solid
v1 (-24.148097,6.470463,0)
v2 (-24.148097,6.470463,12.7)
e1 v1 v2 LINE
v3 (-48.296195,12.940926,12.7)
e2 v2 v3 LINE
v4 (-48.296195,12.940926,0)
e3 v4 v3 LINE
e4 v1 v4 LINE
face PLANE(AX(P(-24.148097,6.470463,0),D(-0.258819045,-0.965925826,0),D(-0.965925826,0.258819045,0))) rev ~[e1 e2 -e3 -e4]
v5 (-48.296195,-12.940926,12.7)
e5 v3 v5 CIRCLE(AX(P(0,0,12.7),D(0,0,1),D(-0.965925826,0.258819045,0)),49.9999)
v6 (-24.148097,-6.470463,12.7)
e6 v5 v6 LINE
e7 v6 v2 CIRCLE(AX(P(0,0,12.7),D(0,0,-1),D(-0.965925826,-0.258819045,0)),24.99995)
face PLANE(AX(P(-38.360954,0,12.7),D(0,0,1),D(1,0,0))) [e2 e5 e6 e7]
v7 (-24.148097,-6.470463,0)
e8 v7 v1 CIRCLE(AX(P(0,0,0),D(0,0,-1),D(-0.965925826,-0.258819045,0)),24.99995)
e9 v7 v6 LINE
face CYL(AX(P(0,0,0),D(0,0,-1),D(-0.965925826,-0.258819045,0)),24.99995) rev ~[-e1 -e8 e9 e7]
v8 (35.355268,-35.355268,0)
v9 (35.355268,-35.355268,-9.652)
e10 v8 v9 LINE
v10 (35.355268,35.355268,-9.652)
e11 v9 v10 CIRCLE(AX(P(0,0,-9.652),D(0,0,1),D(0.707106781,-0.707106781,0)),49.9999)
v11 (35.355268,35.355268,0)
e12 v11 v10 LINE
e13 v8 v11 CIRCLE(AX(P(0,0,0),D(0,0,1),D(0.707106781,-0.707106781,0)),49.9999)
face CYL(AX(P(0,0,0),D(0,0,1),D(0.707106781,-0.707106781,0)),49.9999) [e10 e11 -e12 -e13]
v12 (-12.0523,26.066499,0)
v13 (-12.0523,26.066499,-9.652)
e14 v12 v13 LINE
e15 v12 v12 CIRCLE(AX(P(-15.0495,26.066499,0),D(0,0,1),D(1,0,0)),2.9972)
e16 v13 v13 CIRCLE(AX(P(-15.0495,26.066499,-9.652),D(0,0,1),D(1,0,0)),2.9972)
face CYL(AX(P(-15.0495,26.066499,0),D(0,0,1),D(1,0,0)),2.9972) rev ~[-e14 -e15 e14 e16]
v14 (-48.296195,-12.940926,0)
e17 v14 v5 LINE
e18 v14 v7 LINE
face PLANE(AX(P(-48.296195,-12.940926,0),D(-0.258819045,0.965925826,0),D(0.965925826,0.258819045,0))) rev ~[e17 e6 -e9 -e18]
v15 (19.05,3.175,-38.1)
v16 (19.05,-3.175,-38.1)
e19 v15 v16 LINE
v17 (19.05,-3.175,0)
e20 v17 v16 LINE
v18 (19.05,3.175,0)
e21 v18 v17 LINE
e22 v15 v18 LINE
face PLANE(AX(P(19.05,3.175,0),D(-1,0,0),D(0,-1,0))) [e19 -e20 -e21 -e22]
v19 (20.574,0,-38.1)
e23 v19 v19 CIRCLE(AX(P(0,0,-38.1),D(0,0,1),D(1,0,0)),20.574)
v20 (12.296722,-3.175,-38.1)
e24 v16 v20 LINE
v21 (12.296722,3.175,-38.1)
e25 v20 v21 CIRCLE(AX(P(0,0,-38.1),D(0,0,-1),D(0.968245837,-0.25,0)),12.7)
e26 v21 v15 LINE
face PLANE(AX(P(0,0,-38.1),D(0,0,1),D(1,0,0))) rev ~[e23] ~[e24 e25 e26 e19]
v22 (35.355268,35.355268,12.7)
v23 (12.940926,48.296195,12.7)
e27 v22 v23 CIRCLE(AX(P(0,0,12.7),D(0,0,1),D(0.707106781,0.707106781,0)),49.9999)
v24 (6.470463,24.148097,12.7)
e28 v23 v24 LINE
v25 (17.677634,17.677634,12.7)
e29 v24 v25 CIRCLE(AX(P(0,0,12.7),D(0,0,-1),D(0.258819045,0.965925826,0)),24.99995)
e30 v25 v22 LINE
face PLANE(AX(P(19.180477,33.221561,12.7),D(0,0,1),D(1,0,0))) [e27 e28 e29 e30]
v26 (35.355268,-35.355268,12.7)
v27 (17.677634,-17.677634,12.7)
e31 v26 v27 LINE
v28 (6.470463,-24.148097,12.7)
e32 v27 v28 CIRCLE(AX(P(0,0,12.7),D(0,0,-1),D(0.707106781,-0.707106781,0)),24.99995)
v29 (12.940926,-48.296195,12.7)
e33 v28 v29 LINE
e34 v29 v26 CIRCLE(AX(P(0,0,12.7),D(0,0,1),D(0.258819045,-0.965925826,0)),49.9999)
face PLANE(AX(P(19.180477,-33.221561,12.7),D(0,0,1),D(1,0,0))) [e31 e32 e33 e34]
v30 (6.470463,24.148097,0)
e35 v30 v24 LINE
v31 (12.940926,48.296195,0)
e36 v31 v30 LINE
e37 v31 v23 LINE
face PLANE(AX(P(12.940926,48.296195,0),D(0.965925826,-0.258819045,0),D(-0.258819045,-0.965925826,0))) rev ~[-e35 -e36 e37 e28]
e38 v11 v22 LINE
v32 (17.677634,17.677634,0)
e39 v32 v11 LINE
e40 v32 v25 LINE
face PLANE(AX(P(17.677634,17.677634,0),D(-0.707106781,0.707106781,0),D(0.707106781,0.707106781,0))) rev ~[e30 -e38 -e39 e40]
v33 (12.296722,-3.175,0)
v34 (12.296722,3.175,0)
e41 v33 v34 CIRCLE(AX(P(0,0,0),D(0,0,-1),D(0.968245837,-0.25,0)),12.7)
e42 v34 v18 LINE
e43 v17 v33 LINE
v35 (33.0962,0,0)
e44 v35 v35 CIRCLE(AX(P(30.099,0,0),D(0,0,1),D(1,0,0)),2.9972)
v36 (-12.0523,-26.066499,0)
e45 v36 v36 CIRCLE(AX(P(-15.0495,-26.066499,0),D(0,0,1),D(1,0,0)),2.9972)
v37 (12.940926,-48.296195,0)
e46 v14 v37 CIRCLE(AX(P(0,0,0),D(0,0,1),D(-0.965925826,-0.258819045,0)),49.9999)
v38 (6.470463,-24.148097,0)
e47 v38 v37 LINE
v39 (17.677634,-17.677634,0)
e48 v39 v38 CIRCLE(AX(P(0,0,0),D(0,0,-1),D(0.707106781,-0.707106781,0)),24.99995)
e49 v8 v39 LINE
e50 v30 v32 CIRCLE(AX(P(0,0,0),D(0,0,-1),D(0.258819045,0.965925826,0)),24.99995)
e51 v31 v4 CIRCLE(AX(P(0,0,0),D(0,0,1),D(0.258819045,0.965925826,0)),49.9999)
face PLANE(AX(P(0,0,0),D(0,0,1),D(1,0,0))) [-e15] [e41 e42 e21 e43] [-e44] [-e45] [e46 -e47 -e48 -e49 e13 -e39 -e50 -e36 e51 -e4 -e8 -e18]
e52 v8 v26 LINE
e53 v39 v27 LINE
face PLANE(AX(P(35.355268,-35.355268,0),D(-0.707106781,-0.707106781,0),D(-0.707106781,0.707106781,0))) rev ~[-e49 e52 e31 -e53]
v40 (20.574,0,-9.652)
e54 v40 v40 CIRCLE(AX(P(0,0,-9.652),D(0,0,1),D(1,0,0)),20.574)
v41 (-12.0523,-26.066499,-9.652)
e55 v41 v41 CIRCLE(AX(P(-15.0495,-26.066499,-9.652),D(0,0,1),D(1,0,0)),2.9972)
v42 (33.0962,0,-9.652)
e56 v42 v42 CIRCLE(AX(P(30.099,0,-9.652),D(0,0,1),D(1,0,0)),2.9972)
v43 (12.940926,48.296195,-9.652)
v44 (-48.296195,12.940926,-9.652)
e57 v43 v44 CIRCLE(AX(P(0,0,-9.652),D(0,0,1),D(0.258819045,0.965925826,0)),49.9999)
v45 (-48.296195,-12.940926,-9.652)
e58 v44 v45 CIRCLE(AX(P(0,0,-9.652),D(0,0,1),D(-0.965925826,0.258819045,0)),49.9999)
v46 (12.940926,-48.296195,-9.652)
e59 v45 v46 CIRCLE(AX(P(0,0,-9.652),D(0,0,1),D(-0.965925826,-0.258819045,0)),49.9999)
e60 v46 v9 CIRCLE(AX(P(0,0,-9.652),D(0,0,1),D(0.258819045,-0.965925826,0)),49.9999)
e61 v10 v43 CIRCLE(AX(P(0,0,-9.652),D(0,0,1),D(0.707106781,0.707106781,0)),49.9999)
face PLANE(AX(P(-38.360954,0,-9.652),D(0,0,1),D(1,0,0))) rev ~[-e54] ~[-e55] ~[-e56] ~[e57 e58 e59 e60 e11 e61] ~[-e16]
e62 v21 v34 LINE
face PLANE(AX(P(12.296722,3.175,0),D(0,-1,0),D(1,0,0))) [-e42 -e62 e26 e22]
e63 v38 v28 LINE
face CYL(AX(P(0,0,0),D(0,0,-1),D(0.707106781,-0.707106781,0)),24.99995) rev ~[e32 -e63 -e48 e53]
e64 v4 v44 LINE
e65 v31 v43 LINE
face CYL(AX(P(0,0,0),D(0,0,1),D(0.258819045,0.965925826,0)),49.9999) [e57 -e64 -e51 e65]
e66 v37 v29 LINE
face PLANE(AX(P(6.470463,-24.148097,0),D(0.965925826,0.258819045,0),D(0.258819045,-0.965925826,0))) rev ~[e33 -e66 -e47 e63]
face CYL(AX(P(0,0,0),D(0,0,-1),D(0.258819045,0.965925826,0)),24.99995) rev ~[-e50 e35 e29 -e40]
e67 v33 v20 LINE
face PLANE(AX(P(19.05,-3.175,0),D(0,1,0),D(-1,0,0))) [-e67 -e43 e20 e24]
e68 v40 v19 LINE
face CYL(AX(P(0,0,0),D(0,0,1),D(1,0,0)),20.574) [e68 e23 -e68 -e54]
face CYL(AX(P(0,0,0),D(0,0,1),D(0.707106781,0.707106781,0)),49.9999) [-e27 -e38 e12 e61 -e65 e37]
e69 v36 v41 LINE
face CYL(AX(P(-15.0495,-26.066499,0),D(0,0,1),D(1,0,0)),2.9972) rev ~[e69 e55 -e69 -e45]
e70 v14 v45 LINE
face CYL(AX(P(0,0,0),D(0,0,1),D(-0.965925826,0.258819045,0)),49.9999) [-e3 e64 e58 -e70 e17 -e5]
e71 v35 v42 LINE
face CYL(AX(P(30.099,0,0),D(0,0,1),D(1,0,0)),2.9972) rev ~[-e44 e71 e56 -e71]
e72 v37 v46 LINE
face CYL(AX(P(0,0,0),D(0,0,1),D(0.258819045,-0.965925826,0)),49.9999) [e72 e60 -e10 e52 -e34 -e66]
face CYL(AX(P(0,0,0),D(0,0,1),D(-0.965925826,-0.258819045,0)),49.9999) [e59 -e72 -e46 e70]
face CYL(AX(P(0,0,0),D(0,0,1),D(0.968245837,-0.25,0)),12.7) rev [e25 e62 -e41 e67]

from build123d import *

# Parameters (mm, degrees)
F1_DEPTH = 12.7
F0_R     = 2.9972
F0_R_2   = 20.574
F2_DEPTH = 9.652
F3_DEPTH = 9.652
F4_DEPTH = 38.1


with BuildPart() as f1:
    # F0 (on Top) → F1 (new body)
    with BuildSketch(Plane.XY):
        with BuildLine():
            Line((-24.1480973609, 6.4704631866), (-48.2961947219, 12.9409263732))
            ThreePointArc((-48.2961947219, 12.9409263732), (-49.9999, 0), (-48.2961947219, -12.9409263732))
            Line((-48.2961947219, -12.9409263732), (-24.1480973609, -6.4704631866))
            ThreePointArc((-24.1480973609, -6.4704631866), (-24.99995, 0), (-24.1480973609, 6.4704631866))
        make_face()
    extrude(amount=F1_DEPTH)



with BuildPart() as f1b:
    # F0 (on Top) → F1, piece 2 (new body)
    with BuildSketch(Plane.XY):
        with BuildLine():
            Line((17.6776341743, 17.6776341743), (35.3552683486, 35.3552683486))
            ThreePointArc((35.3552683486, 35.3552683486), (24.99995, 43.3011835867), (12.9409263732, 48.2961947219))
            Line((12.9409263732, 48.2961947219), (6.4704631866, 24.1480973609))
            ThreePointArc((6.4704631866, 24.1480973609), (12.499975, 21.6505917933), (17.6776341743, 17.6776341743))
        make_face()
    extrude(amount=F1_DEPTH)


with BuildPart() as f1c:
    # F0 (on Top) → F1, piece 3 (new body)
    with BuildSketch(Plane.XY):
        with BuildLine():
            ThreePointArc((12.9409263732, -48.2961947219), (24.99995, -43.3011835867), (35.3552683486, -35.3552683486))
            Line((35.3552683486, -35.3552683486), (17.6776341743, -17.6776341743))
            ThreePointArc((17.6776341743, -17.6776341743), (12.499975, -21.6505917933), (6.4704631866, -24.1480973609))
            Line((6.4704631866, -24.1480973609), (12.9409263732, -48.2961947219))
        make_face()
    extrude(amount=F1_DEPTH)


with BuildPart() as f1_1:
    add(f1.part)

    add(f1b.part)  # F2 merges F1b

    add(f1c.part)  # F2 merges F1c
    # F0 (on Top) → F2 (join)
    with BuildSketch(Plane.XY):
        with BuildLine():
            ThreePointArc((35.3552683486, -35.3552683486), (46.1938842376, -19.1341333499), (49.9999, 0))
            ThreePointArc((49.9999, 0), (46.1938842376, 19.1341333499), (35.3552683486, 35.3552683486))
            Line((35.3552683486, 35.3552683486), (17.6776341743, 17.6776341743))
            ThreePointArc((17.6776341743, 17.6776341743), (12.499975, 21.6505917933), (6.4704631866, 24.1480973609))
            Line((6.4704631866, 24.1480973609), (12.9409263732, 48.2961947219))
            ThreePointArc((12.9409263732, 48.2961947219), (-24.99995, 43.3011835867), (-48.2961947219, 12.9409263732))
            Line((-48.2961947219, 12.9409263732), (-24.1480973609, 6.4704631866))
            ThreePointArc((-24.1480973609, 6.4704631866), (-24.99995, 0), (-24.1480973609, -6.4704631866))
            Line((-24.1480973609, -6.4704631866), (-48.2961947219, -12.9409263732))
            ThreePointArc((-48.2961947219, -12.9409263732), (-24.99995, -43.3011835867), (12.9409263732, -48.2961947219))
            Line((12.9409263732, -48.2961947219), (6.4704631866, -24.1480973609))
            ThreePointArc((6.4704631866, -24.1480973609), (12.499975, -21.6505917933), (17.6776341743, -17.6776341743))
            Line((17.6776341743, -17.6776341743), (35.3552683486, -35.3552683486))
        make_face()
        with Locations((-15.0495, -26.0664986285)):
            Circle(F0_R, mode=Mode.SUBTRACT)
        with Locations((-15.0495, 26.0664986285)):
            Circle(F0_R, mode=Mode.SUBTRACT)
        Circle(F0_R_2, mode=Mode.SUBTRACT)
        with Locations((30.099, 0)):
            Circle(F0_R, mode=Mode.SUBTRACT)
        Circle(F0_R_2)
        with BuildLine():
            ThreePointArc((12.2967221242, -3.175), (-12.7, 0), (12.2967221242, 3.175))
            Line((12.2967221242, 3.175), (19.05, 3.175))
            Line((19.05, 3.175), (19.05, 0))
            Line((19.05, 0), (19.05, -3.175))
            Line((19.05, -3.175), (12.2967221242, -3.175))
        make_face(mode=Mode.SUBTRACT)
    extrude(amount=-F2_DEPTH)

    # F3 (add): faces of the model
    f3_faces = [f1_1.faces().sort_by_distance(p)[0] for p in [
        (-38.4460981424, 0, 0),
        (19.2230490712, 33.2952976677, 0),
        (19.2230490712, -33.2952976677, 0),
    ]]
    extrude(f3_faces, amount=F3_DEPTH)

    # F0 (on Top) → F4 (join)
    with BuildSketch(Plane.XY):
        Circle(F0_R_2)
        with BuildLine():
            ThreePointArc((12.2967221242, -3.175), (-12.7, 0), (12.2967221242, 3.175))
            Line((12.2967221242, 3.175), (19.05, 3.175))
            Line((19.05, 3.175), (19.05, 0))
            Line((19.05, 0), (19.05, -3.175))
            Line((19.05, -3.175), (12.2967221242, -3.175))
        make_face(mode=Mode.SUBTRACT)
    extrude(amount=-F4_DEPTH)


solid = f1_1.part
